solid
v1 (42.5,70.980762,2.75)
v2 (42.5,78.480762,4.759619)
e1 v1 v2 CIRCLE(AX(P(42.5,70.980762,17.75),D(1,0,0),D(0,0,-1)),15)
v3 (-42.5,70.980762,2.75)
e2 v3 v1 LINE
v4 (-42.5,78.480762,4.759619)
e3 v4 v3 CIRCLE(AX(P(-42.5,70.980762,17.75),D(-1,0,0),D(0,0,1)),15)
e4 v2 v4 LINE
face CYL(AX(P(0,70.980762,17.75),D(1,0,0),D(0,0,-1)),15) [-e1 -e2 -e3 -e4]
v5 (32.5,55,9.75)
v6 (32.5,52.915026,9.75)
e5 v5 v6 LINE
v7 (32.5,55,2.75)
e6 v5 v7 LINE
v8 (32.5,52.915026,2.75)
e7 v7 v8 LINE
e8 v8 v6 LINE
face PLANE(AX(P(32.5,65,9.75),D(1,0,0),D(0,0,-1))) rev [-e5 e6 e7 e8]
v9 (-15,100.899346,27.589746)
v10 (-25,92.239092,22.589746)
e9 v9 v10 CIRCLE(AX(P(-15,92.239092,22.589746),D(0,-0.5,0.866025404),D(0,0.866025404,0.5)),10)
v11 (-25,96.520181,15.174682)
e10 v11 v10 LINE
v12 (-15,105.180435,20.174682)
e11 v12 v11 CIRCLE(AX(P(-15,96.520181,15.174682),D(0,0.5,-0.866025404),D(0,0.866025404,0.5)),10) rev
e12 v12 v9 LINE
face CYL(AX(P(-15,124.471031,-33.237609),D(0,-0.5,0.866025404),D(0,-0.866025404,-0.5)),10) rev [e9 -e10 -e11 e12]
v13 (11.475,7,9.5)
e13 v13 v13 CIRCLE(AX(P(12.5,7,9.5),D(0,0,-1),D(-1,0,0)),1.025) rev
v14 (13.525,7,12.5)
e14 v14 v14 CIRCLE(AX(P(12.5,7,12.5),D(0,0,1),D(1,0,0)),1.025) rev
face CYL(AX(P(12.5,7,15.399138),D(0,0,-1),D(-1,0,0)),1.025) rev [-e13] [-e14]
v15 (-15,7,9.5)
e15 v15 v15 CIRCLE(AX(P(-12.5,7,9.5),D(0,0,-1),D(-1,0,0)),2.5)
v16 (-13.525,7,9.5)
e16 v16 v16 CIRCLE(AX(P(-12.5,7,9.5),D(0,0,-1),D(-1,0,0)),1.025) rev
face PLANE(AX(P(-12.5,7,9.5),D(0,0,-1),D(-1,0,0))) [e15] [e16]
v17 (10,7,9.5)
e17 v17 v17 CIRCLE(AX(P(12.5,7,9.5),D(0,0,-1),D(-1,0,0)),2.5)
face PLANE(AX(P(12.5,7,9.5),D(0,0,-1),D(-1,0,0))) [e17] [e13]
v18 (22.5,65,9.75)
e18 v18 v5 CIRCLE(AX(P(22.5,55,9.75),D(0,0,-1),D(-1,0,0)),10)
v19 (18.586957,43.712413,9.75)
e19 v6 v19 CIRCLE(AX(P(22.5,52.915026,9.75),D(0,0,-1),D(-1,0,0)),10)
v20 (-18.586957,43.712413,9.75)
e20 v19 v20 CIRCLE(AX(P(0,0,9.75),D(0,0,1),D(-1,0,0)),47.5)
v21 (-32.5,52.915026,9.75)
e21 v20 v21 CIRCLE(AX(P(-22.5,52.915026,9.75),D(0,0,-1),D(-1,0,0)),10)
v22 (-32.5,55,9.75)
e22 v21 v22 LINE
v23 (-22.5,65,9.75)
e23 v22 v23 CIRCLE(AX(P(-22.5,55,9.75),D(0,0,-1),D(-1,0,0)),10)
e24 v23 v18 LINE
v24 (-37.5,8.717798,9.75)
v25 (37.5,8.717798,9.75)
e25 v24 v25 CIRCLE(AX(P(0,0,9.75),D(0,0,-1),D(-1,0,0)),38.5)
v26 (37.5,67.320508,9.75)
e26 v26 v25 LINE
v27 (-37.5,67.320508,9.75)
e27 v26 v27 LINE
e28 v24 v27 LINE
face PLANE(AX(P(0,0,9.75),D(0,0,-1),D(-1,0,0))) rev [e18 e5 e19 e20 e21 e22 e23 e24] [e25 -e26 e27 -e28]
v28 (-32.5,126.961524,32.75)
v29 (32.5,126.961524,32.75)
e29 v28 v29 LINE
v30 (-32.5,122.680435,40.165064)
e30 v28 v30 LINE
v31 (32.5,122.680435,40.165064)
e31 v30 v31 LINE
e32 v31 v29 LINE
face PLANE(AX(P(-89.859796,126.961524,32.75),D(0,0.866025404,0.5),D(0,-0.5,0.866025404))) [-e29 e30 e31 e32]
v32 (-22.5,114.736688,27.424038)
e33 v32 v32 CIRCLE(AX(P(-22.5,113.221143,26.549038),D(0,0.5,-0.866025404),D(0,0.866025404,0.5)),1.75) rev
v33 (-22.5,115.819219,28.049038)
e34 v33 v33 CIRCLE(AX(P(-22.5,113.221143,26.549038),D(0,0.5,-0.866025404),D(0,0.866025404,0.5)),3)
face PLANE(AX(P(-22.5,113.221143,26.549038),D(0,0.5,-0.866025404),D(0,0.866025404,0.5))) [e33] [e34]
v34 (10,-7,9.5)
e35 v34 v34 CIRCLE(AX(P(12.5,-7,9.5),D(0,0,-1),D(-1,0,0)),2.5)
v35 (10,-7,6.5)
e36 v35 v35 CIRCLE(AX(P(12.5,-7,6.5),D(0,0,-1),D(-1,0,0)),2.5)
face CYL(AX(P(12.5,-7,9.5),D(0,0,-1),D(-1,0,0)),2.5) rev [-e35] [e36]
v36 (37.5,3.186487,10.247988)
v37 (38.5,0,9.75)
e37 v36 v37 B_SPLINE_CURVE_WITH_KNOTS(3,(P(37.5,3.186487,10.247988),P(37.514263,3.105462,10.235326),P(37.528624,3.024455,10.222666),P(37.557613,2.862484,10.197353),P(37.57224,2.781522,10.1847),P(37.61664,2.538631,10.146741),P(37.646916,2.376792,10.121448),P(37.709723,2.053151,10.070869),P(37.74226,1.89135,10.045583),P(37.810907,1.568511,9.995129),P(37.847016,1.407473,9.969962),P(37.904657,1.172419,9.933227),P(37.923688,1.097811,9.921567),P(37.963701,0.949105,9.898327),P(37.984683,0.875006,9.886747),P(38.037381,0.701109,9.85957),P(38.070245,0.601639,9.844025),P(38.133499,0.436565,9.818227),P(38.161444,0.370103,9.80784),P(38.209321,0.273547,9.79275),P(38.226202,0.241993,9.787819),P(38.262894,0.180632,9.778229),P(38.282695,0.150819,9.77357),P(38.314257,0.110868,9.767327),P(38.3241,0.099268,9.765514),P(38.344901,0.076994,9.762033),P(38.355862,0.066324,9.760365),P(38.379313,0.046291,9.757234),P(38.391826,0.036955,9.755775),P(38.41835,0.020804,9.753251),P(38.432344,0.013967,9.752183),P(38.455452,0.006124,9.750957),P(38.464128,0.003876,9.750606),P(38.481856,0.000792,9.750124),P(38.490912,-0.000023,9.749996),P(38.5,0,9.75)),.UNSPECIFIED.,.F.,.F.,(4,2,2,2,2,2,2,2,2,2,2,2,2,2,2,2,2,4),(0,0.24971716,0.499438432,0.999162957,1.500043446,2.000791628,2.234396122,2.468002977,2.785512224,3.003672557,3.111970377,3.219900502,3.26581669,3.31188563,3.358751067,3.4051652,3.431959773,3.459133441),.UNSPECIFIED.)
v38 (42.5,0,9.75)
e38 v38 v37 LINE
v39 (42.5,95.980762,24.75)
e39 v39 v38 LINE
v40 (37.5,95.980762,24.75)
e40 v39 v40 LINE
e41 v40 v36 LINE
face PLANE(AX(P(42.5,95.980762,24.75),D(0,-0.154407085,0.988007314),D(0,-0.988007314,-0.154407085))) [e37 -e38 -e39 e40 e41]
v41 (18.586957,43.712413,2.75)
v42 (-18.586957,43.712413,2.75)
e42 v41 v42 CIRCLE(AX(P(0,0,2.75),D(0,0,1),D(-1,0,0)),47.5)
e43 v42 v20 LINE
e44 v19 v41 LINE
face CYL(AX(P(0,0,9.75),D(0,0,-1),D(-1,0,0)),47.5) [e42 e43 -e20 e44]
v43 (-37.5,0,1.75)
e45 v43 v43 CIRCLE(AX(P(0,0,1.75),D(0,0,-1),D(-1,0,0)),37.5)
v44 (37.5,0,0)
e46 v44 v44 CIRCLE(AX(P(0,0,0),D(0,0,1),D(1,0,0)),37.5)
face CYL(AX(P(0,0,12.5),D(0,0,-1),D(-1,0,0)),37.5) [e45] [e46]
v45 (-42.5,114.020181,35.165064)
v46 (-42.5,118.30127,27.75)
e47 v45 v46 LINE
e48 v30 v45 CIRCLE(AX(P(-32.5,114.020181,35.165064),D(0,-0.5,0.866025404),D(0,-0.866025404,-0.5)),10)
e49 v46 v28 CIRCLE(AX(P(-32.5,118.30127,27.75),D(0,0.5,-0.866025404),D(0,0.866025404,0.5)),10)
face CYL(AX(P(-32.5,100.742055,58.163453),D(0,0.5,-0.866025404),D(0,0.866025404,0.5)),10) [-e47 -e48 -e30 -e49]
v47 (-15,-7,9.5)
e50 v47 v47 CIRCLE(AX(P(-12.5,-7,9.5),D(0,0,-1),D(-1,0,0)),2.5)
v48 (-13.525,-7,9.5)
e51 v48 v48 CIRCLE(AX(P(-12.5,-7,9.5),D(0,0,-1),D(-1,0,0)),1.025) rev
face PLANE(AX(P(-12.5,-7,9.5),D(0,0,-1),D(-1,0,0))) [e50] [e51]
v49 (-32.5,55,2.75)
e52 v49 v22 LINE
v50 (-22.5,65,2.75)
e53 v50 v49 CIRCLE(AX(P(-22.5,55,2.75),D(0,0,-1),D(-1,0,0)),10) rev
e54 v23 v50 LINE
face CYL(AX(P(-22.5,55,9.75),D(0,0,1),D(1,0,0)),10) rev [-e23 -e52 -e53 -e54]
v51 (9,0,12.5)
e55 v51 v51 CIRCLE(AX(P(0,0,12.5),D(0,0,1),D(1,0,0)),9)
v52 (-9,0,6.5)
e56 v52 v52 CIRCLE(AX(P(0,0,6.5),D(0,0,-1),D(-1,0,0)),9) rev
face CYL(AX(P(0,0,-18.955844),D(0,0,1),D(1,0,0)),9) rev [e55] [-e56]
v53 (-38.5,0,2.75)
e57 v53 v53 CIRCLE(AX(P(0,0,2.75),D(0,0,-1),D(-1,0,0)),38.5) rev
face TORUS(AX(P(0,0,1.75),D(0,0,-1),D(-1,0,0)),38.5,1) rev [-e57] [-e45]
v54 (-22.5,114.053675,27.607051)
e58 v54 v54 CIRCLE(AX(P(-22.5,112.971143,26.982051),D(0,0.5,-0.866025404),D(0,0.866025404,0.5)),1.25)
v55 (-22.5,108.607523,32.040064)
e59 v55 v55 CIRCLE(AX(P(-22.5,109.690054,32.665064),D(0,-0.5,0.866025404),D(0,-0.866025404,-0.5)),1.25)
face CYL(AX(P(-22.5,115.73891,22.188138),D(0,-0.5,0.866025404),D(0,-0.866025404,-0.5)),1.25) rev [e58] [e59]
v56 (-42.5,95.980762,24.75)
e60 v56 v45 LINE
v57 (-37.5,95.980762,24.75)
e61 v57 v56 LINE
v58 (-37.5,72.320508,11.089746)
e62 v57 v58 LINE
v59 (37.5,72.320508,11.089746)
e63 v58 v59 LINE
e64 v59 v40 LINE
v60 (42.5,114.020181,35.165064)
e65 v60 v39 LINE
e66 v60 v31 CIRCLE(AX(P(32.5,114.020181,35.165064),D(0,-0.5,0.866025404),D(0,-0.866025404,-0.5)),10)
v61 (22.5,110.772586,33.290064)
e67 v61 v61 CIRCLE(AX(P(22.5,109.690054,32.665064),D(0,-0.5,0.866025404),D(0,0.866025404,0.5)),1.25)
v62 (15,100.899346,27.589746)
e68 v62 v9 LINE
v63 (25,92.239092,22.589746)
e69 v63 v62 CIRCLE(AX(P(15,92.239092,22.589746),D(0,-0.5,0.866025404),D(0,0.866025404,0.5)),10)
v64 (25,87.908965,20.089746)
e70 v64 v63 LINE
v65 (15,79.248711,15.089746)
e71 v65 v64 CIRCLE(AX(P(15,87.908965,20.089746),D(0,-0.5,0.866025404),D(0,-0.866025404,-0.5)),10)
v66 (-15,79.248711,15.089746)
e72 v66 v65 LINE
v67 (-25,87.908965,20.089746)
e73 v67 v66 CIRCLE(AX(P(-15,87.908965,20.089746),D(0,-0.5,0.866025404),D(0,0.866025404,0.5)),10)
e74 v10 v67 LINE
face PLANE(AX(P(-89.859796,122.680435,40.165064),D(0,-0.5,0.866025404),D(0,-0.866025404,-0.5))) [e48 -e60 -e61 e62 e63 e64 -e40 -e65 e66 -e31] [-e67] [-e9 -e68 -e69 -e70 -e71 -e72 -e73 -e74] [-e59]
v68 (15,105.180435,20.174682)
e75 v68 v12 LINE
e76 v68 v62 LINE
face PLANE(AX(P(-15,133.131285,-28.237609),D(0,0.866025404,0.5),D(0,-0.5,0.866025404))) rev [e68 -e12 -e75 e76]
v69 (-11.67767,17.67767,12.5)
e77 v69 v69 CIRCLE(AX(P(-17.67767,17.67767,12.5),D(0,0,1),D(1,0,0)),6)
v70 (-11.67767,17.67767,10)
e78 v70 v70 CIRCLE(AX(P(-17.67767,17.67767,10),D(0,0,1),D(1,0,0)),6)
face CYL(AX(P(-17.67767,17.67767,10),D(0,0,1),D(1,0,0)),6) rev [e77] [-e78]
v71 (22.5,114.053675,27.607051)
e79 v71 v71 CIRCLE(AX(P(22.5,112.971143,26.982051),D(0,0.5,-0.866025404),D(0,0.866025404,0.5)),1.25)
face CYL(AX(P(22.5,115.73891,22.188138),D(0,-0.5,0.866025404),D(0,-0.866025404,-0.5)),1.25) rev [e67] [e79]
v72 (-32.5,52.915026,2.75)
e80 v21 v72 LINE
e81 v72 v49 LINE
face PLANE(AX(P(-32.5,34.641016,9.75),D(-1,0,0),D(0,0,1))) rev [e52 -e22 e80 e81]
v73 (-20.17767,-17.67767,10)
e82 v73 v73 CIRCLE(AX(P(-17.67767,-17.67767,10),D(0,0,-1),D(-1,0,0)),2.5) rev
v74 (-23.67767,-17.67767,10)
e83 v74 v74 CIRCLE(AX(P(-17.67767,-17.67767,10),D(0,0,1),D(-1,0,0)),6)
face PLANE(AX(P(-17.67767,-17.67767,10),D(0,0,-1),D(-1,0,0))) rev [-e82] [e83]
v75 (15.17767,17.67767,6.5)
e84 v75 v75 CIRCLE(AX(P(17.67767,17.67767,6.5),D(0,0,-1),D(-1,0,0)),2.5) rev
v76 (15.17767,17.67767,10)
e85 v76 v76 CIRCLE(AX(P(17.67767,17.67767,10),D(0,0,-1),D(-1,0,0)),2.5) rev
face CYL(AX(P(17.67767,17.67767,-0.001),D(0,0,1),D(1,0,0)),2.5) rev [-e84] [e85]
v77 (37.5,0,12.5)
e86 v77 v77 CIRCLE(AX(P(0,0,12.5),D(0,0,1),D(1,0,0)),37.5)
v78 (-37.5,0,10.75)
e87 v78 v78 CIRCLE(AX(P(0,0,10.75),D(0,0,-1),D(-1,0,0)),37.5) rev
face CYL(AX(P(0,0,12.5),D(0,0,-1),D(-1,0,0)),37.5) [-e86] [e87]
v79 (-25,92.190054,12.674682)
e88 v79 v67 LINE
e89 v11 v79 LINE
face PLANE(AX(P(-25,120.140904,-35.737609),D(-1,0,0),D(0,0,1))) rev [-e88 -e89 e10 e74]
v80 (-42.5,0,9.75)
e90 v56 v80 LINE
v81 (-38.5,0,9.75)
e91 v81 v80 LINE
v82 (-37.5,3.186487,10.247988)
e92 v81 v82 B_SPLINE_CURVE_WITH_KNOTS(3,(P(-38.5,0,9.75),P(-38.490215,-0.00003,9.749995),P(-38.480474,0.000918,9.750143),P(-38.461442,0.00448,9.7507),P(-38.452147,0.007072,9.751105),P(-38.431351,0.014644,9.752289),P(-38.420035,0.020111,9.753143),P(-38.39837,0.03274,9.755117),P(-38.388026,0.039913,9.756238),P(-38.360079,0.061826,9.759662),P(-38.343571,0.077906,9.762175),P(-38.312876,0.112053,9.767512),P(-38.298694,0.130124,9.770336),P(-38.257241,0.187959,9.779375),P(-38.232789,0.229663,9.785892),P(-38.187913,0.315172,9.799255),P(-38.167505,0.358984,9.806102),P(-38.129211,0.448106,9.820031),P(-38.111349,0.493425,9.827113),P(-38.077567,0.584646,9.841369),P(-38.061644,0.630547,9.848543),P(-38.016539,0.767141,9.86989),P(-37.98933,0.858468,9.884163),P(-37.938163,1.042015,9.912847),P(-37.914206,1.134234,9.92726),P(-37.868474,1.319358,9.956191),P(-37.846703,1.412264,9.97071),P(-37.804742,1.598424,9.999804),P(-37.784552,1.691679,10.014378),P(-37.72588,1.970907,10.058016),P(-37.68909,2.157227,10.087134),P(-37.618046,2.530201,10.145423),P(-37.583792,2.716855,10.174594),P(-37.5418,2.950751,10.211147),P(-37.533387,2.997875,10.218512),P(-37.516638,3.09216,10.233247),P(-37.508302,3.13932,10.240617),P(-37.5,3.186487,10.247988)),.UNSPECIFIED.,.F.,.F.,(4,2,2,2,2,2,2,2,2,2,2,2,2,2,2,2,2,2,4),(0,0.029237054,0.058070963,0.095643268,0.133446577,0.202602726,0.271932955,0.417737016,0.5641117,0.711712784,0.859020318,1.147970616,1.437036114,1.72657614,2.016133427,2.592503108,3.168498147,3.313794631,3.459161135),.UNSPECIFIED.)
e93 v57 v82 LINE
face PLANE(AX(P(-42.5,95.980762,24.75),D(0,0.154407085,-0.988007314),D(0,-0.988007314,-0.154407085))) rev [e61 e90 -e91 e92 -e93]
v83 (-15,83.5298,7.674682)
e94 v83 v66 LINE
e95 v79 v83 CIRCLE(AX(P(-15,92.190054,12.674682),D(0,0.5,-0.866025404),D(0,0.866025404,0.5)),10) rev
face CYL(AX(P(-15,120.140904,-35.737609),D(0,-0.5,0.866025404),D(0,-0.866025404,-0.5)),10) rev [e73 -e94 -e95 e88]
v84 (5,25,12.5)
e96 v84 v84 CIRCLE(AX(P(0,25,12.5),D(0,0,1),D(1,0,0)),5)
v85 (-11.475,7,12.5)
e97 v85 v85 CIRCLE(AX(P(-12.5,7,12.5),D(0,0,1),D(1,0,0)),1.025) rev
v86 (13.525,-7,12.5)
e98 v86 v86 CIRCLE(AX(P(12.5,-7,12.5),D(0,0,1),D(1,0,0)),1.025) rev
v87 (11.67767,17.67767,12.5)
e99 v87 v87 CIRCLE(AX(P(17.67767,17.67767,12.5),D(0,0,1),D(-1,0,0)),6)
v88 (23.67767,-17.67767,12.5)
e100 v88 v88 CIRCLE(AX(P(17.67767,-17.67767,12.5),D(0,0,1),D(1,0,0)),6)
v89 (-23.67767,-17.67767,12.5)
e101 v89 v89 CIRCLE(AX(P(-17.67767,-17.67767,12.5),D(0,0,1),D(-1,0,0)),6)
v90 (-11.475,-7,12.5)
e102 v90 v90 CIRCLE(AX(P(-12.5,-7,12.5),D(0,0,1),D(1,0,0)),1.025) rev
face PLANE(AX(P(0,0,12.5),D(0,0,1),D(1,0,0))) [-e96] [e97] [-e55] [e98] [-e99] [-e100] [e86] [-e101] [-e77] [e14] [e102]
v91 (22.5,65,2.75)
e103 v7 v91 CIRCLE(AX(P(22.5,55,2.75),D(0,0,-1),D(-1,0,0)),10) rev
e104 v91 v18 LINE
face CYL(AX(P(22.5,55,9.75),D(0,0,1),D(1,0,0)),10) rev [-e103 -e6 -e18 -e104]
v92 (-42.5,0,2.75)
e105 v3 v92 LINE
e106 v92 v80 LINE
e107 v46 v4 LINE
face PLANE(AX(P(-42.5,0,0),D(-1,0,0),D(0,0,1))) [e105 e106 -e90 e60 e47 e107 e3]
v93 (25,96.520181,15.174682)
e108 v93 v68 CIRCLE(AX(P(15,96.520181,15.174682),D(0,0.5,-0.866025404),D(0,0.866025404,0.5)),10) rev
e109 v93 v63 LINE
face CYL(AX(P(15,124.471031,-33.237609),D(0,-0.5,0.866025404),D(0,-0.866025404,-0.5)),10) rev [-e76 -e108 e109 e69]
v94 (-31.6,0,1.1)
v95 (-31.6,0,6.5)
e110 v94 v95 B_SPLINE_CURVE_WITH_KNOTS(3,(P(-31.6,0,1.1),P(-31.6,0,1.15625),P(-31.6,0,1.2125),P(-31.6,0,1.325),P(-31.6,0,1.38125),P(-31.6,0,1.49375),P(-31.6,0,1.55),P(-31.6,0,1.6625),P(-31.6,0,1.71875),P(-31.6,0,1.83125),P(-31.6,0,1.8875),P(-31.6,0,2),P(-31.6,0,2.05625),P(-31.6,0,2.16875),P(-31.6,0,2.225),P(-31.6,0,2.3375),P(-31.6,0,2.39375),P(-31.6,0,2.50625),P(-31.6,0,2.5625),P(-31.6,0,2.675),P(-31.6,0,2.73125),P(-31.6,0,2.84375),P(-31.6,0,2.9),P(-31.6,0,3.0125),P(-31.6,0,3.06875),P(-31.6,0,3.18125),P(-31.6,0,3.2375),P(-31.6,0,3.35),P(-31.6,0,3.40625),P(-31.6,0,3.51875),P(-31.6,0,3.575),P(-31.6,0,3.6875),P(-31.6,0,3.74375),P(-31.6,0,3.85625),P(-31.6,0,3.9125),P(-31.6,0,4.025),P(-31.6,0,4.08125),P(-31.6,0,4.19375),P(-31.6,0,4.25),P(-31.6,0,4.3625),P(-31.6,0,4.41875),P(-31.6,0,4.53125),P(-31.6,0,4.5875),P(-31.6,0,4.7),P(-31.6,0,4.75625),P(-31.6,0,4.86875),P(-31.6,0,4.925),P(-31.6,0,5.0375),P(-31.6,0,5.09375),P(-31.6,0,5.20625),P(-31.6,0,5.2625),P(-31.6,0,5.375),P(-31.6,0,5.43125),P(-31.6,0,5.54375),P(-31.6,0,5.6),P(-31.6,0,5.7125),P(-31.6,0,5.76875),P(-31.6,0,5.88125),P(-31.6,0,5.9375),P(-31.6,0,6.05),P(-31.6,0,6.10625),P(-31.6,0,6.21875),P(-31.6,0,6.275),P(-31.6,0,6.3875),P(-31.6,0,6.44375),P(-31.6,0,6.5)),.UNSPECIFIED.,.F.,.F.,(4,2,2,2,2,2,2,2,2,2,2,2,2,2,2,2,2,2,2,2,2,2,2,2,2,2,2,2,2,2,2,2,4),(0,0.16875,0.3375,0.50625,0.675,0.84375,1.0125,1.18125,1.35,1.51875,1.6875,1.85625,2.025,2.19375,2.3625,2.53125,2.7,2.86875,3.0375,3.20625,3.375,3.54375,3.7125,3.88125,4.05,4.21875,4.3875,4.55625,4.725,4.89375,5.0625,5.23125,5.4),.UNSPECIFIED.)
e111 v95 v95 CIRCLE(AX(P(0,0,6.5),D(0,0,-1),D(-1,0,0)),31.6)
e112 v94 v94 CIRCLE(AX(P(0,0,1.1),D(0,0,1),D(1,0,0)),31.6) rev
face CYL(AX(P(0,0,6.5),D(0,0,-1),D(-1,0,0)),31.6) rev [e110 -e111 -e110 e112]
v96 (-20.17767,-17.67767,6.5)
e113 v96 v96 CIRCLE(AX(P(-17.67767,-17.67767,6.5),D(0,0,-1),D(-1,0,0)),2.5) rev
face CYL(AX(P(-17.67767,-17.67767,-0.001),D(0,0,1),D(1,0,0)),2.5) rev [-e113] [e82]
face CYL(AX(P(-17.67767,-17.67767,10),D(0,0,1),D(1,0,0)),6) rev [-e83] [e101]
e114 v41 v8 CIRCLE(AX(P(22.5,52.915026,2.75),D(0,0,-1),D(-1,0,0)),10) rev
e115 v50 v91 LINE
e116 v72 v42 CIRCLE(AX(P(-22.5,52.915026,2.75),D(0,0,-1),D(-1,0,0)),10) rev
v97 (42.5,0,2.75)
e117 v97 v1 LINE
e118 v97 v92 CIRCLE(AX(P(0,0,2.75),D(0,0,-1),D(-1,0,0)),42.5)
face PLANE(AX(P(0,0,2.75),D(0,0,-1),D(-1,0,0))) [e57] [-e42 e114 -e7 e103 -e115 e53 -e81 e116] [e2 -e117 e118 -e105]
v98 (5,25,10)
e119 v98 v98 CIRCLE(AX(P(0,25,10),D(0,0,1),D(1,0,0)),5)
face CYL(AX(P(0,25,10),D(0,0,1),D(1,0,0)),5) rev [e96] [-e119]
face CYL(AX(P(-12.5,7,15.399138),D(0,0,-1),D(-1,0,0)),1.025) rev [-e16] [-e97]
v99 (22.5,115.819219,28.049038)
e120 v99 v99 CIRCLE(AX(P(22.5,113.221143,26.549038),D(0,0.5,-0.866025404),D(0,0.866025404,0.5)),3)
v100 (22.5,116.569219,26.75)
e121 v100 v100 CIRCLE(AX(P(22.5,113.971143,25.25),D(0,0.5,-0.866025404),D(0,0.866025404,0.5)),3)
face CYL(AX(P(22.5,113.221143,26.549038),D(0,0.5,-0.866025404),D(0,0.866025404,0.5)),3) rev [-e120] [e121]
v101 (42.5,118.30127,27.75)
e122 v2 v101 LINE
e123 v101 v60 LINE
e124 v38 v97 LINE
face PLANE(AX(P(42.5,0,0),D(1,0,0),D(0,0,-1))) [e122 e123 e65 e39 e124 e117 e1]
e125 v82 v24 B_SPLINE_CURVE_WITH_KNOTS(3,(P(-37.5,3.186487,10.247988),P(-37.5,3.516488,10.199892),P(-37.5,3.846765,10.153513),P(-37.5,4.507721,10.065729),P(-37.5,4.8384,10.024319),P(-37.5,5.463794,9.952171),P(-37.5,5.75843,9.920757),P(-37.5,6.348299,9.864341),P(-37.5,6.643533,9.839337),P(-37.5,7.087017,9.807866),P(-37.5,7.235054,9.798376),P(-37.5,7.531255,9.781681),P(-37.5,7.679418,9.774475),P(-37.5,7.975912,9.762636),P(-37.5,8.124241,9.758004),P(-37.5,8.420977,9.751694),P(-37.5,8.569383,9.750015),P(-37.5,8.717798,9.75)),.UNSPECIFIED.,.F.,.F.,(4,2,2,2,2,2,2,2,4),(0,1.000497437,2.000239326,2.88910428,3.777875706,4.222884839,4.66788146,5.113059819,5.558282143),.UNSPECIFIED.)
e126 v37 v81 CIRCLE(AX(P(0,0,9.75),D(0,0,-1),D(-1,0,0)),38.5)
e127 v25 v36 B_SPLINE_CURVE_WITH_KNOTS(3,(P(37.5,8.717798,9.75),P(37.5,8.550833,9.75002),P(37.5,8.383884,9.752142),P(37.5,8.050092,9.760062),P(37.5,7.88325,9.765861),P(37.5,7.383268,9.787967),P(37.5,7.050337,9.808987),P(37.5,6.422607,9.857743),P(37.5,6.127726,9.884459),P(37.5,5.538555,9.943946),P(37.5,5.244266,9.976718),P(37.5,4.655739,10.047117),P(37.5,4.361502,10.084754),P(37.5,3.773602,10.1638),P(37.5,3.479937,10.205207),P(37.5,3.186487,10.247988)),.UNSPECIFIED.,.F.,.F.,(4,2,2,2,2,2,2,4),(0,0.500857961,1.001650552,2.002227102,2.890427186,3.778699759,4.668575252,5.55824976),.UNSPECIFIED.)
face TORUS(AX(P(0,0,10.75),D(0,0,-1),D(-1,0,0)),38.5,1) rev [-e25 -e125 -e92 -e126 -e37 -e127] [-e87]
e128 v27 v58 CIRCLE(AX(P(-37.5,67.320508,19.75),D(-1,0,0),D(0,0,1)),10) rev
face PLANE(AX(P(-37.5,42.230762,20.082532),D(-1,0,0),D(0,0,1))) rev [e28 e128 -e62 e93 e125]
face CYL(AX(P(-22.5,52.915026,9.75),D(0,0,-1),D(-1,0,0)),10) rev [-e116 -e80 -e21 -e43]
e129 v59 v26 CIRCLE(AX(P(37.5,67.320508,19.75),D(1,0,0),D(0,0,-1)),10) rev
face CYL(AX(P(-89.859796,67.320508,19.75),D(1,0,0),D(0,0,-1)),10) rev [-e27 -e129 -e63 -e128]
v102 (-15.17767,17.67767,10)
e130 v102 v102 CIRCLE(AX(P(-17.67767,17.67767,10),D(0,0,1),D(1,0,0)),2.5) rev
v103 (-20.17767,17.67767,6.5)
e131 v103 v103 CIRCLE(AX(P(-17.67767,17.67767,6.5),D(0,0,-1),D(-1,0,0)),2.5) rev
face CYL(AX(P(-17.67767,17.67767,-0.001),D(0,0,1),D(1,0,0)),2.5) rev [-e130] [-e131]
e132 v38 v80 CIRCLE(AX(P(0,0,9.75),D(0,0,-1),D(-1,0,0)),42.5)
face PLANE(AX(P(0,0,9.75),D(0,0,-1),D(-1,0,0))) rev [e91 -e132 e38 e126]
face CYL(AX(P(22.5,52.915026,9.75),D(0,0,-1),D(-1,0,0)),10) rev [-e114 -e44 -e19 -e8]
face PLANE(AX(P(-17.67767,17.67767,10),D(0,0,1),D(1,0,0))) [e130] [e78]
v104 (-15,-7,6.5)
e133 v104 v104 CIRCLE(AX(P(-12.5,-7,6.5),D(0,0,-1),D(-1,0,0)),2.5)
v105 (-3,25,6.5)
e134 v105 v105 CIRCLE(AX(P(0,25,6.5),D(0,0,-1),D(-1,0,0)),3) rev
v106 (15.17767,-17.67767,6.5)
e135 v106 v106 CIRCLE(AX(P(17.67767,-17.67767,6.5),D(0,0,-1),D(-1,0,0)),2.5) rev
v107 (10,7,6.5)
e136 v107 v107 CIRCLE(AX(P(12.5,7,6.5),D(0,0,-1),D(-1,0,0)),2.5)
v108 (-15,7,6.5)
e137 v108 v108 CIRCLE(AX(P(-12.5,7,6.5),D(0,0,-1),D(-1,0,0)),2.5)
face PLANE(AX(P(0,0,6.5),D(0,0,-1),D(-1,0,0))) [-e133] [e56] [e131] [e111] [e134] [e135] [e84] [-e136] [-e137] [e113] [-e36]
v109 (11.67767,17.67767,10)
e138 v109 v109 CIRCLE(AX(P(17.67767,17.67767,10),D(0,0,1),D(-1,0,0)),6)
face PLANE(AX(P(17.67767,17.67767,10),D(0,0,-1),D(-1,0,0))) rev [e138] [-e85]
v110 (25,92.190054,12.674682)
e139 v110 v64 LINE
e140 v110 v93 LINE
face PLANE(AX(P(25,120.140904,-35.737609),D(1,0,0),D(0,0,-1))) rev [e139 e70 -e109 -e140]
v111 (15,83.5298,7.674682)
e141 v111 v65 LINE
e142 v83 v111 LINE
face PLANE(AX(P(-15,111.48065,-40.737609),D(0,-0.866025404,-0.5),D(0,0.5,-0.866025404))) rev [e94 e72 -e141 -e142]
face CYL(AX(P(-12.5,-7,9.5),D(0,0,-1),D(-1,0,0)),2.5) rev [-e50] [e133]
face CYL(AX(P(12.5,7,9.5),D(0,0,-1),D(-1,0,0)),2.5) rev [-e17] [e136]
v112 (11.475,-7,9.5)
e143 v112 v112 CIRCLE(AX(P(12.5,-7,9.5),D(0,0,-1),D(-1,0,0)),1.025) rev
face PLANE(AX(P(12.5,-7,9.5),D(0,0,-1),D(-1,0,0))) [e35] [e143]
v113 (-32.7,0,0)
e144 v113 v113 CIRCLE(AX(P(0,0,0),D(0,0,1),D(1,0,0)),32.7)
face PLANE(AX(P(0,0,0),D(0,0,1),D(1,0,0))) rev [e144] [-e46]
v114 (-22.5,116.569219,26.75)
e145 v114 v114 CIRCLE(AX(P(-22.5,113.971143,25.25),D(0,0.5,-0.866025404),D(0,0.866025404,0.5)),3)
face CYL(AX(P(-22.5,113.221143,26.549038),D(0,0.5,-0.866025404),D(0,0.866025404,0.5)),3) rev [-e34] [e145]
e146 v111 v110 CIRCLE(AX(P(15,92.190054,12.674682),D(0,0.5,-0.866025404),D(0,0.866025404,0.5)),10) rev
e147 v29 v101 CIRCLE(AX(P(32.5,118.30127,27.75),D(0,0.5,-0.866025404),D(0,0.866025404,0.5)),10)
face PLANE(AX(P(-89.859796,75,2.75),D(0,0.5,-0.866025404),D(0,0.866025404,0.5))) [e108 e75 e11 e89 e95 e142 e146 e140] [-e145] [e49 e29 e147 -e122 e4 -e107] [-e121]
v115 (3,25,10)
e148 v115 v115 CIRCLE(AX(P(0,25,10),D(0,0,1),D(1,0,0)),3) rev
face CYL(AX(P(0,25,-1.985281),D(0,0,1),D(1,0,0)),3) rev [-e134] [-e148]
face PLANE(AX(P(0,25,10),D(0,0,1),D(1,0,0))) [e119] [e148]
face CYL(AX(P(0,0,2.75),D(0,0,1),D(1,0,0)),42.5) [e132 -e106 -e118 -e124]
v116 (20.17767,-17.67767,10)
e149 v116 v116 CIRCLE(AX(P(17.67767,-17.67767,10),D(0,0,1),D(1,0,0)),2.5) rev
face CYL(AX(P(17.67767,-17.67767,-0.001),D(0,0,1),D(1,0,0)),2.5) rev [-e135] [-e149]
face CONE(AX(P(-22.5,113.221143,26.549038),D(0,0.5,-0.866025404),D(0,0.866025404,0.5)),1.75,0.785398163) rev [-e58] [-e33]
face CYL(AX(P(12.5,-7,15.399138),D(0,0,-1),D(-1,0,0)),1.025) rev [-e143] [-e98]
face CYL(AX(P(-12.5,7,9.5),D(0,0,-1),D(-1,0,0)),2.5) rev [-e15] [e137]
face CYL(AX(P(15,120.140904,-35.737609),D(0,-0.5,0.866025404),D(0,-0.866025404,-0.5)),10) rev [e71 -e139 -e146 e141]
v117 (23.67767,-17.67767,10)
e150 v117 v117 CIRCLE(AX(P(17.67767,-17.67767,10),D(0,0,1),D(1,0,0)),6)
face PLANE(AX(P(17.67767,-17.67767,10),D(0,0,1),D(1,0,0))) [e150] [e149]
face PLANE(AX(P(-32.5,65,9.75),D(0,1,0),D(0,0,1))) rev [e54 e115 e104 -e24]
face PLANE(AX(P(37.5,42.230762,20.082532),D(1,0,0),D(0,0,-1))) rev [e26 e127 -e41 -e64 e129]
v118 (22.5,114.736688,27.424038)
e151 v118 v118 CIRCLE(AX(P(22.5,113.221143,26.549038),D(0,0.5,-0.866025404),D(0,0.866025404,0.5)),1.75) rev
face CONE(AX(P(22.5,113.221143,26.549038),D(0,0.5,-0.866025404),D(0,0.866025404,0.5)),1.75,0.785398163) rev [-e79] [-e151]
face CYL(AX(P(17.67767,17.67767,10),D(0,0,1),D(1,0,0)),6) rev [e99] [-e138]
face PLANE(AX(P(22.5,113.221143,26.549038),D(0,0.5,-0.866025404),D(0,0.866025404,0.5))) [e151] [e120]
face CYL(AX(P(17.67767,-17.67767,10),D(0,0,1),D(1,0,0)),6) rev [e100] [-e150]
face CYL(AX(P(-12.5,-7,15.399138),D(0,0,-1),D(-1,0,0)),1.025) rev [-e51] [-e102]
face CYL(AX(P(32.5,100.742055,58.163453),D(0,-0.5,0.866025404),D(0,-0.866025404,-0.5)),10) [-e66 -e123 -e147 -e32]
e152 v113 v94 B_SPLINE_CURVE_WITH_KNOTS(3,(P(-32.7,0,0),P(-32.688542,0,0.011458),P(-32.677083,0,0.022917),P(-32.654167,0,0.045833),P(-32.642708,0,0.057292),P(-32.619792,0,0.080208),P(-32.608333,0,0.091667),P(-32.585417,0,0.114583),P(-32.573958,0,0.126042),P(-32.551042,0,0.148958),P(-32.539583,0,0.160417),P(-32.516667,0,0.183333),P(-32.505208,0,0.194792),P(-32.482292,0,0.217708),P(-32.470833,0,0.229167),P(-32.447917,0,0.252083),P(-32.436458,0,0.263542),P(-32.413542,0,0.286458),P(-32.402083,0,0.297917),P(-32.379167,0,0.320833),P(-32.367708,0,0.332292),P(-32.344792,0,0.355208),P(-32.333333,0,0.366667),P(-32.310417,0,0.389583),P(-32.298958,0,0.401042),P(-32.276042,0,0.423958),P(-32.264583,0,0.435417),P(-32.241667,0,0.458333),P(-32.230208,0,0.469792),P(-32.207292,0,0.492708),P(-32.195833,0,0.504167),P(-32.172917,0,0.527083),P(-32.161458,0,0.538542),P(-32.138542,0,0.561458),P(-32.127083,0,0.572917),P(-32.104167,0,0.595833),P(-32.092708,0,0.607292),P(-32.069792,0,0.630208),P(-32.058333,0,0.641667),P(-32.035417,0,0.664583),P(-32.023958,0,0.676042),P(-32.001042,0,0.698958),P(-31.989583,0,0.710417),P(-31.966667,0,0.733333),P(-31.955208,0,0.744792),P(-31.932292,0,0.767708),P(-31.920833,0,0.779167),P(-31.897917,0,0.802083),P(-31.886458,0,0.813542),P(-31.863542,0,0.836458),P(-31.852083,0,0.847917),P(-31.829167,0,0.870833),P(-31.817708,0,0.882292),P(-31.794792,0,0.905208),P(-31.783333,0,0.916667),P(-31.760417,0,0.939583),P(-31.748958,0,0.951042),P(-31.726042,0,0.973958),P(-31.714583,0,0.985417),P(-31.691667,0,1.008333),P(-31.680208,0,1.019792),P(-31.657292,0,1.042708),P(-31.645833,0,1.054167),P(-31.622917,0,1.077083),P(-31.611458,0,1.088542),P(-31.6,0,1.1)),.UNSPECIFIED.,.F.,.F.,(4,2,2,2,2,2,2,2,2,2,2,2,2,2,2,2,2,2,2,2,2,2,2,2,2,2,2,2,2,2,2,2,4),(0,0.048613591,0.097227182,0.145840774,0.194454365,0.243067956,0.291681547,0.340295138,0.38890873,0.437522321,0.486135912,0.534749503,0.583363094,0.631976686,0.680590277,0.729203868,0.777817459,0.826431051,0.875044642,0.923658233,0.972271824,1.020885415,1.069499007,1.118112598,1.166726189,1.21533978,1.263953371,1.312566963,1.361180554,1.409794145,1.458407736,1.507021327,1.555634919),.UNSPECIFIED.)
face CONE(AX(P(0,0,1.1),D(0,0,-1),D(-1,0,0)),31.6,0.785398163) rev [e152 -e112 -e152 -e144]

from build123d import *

# Parameters (mm, degrees)
SKETCH_1_R            = 37.5
EXTRUDE_1_DEPTH       = 12.5
SKETCH_2_R            = 31.6
CUT_EXTRUDE_1_DEPTH   = 6.5
CUT_EXTRUDE_2_REACH   = 56.486
SKETCH_3_R            = 2.5
SKETCH_4_R            = 6
CUT_EXTRUDE_3_DEPTH   = 2.5
CHAMFER_2_SIZE        = 1.1
SKETCH_14_R           = 1.025
CUT_EXTRUDE_4_DEPTH   = 6
SKETCH_15_R           = 2.5
CUT_EXTRUDE_5_DEPTH   = 3
SKETCH_17_R           = 9
CUT_EXTRUDE_7_DEPTH   = 6
SKETCH_18_R           = 3
CUT_EXTRUDE_8_DEPTH   = 6
SKETCH_19_R           = 5
CUT_EXTRUDE_9_DEPTH   = 2.5
SKETCH_24_R           = 42.5
SKETCH_24_R_2         = 37.5
EXTRUDE_2_DEPTH       = 3.5
EXTRUDE_START         = 40.640001537
EXTRUDE_3_OUTLINE_W   = 132.359796054
EXTRUDE_3_OUTLINE_H   = 7
EXTRUDE_3_DEPTH       = 34.359998463
EXTRUDE_START_2       = 2.75
EXTRUDE_3_2_DEPTH     = 7
EXTRUDE_START_3       = 26.556252313
EXTRUDE_3_3_OUTLINE_W = 132.359796054
EXTRUDE_3_3_OUTLINE_H = 60
EXTRUDE_3_3_DEPTH     = 8.562177827
EXTRUDE_3_4_OUTLINE_W = 132.359796054
EXTRUDE_3_4_OUTLINE_H = 0.830127019
EXTRUDE_3_4_DEPTH     = 2.5
CUT_EXTRUDE_11_DEPTH  = 47.359796
CUT_EXTRUDE_12_DEPTH  = 7
RIB_10_REACH          = 159.979
SKETCH_31_WALL_W      = 415.104412192
SKETCH_31_WALL_H      = 5
FILLET_6_R            = 10
FILLET_7_R            = 10
SKETCH_34_R           = 1.25
CUT_EXTRUDE_14_DEPTH  = 8.562177826
SKETCH_35_R           = 3
CUT_EXTRUDE_15_DEPTH  = 1.5
CUT_EXTRUDE_16_DEPTH  = 8.562177826
FILLET_9_R            = 1
FILLET_10_R           = 15
CHAMFER_3_SIZE        = 0.5
FILLET_11_R           = 10
FILLET_12_R           = 10


with BuildPart() as part:
    # 草图1 → 凸台-拉伸1 (new body)
    with BuildSketch(Plane.XY):
        Circle(SKETCH_1_R)
    extrude(amount=EXTRUDE_1_DEPTH)

    # 草图2 → 切除-拉伸1 (cut)
    with BuildSketch(Plane(origin=(0, 0, 0), x_dir=(-1, 0, 0), z_dir=(0, 0, -1))):
        Circle(SKETCH_2_R)
    extrude(amount=-CUT_EXTRUDE_1_DEPTH, mode=Mode.SUBTRACT)

    # 草图3 → 切除-拉伸2 (cut, up to next)
    with BuildSketch(Plane.XY.offset(12.5), mode=Mode.PRIVATE) as cut_extrude_2_sk1:
        with Locations((17.67766953, 17.67766953)):
            Circle(SKETCH_3_R)
    cut_extrude_2_tool1 = extrude(cut_extrude_2_sk1.sketch, amount=-CUT_EXTRUDE_2_REACH, mode=Mode.PRIVATE) & part.part
    # 草图3 → 切除-拉伸2 (cut, up to next)
    with BuildSketch(Plane.XY.offset(12.5), mode=Mode.PRIVATE) as cut_extrude_2_sk2:
        with Locations(Location((17.67766953, -17.67766953, 0), (0, 0, 180))):
            Circle(SKETCH_3_R)
    cut_extrude_2_tool2 = extrude(cut_extrude_2_sk2.sketch, amount=-CUT_EXTRUDE_2_REACH, mode=Mode.PRIVATE) & part.part
    # 草图3 → 切除-拉伸2 (cut, up to next)
    with BuildSketch(Plane.XY.offset(12.5), mode=Mode.PRIVATE) as cut_extrude_2_sk3:
        with Locations((-17.67766953, -17.67766953)):
            Circle(SKETCH_3_R)
    cut_extrude_2_tool3 = extrude(cut_extrude_2_sk3.sketch, amount=-CUT_EXTRUDE_2_REACH, mode=Mode.PRIVATE) & part.part
    # 草图3 → 切除-拉伸2 (cut, up to next)
    with BuildSketch(Plane.XY.offset(12.5), mode=Mode.PRIVATE) as cut_extrude_2_sk4:
        with Locations(Location((-17.67766953, 17.67766953, 0), (0, 0, 180))):
            Circle(SKETCH_3_R)
    cut_extrude_2_tool4 = extrude(cut_extrude_2_sk4.sketch, amount=-CUT_EXTRUDE_2_REACH, mode=Mode.PRIVATE) & part.part
    add(cut_extrude_2_tool1.solids().sort_by_distance((17.67767, 17.67767, 12.5))[0], mode=Mode.SUBTRACT)
    add(cut_extrude_2_tool2.solids().sort_by_distance((17.67767, -17.67767, 12.5))[0], mode=Mode.SUBTRACT)
    add(cut_extrude_2_tool3.solids().sort_by_distance((-17.67767, -17.67767, 12.5))[0], mode=Mode.SUBTRACT)
    add(cut_extrude_2_tool4.solids().sort_by_distance((-17.67767, 17.67767, 12.5))[0], mode=Mode.SUBTRACT)

    # 草图4 → 切除-拉伸3 (cut)
    with BuildSketch(Plane.XY.offset(12.5)):
        with Locations((-17.67766953, 17.67766953)):
            Circle(SKETCH_4_R)
        with Locations(Location((17.67766953, 17.67766953, 0), (0, 0, 180))):
            Circle(SKETCH_4_R)
        with Locations((17.67766953, -17.67766953)):
            Circle(SKETCH_4_R)
        with Locations(Location((-17.67766953, -17.67766953, 0), (0, 0, 180))):
            Circle(SKETCH_4_R)
    extrude(amount=-CUT_EXTRUDE_3_DEPTH, mode=Mode.SUBTRACT)

    # 倒角2
    chamfer_2_edges = [part.edges().sort_by_distance(p)[0] for p in [
        (31.6, 0, 0),
    ]]
    chamfer(chamfer_2_edges, length=CHAMFER_2_SIZE)

    # 草图14 → 切除-拉伸4 (cut)
    with BuildSketch(Plane(origin=(0, 0, 6.5), x_dir=(-1, 0, 0), z_dir=(0, 0, -1))):
        with Locations((12.5, 7)):
            Circle(SKETCH_14_R)
        with Locations(Location((12.5, -7, 0), (0, 0, 180))):
            Circle(SKETCH_14_R)
        with Locations((-12.5, -7)):
            Circle(SKETCH_14_R)
        with Locations(Location((-12.5, 7, 0), (0, 0, 180))):
            Circle(SKETCH_14_R)
    extrude(amount=-CUT_EXTRUDE_4_DEPTH, mode=Mode.SUBTRACT)

    # 草图15 → 切除-拉伸5 (cut)
    with BuildSketch(Plane(origin=(0, 0, 6.5), x_dir=(-1, 0, 0), z_dir=(0, 0, -1))):
        with Locations((12.5, 7)):
            Circle(SKETCH_15_R)
        with Locations((12.5, -7)):
            Circle(SKETCH_15_R)
        with Locations((-12.5, -7)):
            Circle(SKETCH_15_R)
        with Locations((-12.5, 7)):
            Circle(SKETCH_15_R)
    extrude(amount=-CUT_EXTRUDE_5_DEPTH, mode=Mode.SUBTRACT)

    # 草图17 → 切除-拉伸7 (cut)
    with BuildSketch(Plane.XY.offset(12.5)):
        Circle(SKETCH_17_R)
    extrude(amount=-CUT_EXTRUDE_7_DEPTH, mode=Mode.SUBTRACT)

    # 草图18 → 切除-拉伸8 (cut)
    with BuildSketch(Plane.XY.offset(12.5)):
        with Locations((0, 25)):
            Circle(SKETCH_18_R)
    extrude(amount=-CUT_EXTRUDE_8_DEPTH, mode=Mode.SUBTRACT)

    # 草图19 → 切除-拉伸9 (cut)
    with BuildSketch(Plane.XY.offset(12.5)):
        with Locations((0, 25)):
            Circle(SKETCH_19_R)
    extrude(amount=-CUT_EXTRUDE_9_DEPTH, mode=Mode.SUBTRACT)

    # 草图24 → 凸台-拉伸2 (add, symmetric)
    with BuildSketch(Plane(origin=(0, 0, 6.25), x_dir=(-1, 0, 0), z_dir=(0, 0, -1))):
        Circle(SKETCH_24_R)
        Circle(SKETCH_24_R_2, mode=Mode.SUBTRACT)
    extrude(amount=EXTRUDE_2_DEPTH, both=True)

    # 凸台-拉伸3: read off the stored shape, not the designer's step
    # 凸台-拉伸3 outline → 凸台-拉伸3 (add)
    with BuildSketch(Plane(origin=(0, 0, 0), x_dir=(1, 0, 0), z_dir=(0, 1, 0)).offset(EXTRUDE_START)):
        with Locations((-23.679898027, -6.25)):
            Rectangle(EXTRUDE_3_OUTLINE_W, EXTRUDE_3_OUTLINE_H)
    extrude(amount=EXTRUDE_3_DEPTH)

    # Extrude 3 2 outline → Extrude 3 2 (add)
    with BuildSketch(Plane.XY.offset(EXTRUDE_START_2)):
        with BuildLine():
            Line((-89.859796054, 40.640001537), (-89.859796054, 0))
            Line((-89.859796054, 0), (-42.5, 0))
            ThreePointArc((-42.5, 0), (-34.166916622, 25.275913604), (-12.435444305, 40.640001537))
            Line((-12.435444305, 40.640001537), (-89.859796054, 40.640001537))
        make_face()
        with BuildLine():
            ThreePointArc((12.435444305, 40.640001537), (34.166916622, 25.275913604), (42.5, 0))
            Line((42.5, 0), (42.5, 40.640001537))
            Line((42.5, 40.640001537), (12.435444305, 40.640001537))
        make_face()
    extrude(amount=EXTRUDE_3_2_DEPTH)

    # Extrude 3 3 outline → Extrude 3 3 (add)
    with BuildSketch(Plane(origin=(0, 0, 0), x_dir=(1, 0, 0), z_dir=(0, 0.500000000000001, -0.866025403784438)).offset(EXTRUDE_START_3)):
        with Locations((-23.679898027, -96.326905284)):
            Rectangle(EXTRUDE_3_3_OUTLINE_W, EXTRUDE_3_3_OUTLINE_H)
    extrude(amount=EXTRUDE_3_3_DEPTH)

    # Extrude 3 4 outline → Extrude 3 4 (add)
    with BuildSketch(Plane(origin=(0, 0, 0), x_dir=(1, 0, 0), z_dir=(0, 0.500000000000001, -0.866025403784438)).offset(EXTRUDE_START_3)):
        with Locations((-23.679898027, -65.911841775)):
            Rectangle(EXTRUDE_3_4_OUTLINE_W, EXTRUDE_3_4_OUTLINE_H)
    extrude(amount=EXTRUDE_3_4_DEPTH)

    # 草图26 → 切除-拉伸11 (cut)
    with BuildSketch(Plane.ZY.offset(89.859796054)):
        Polygon((9.75, 0), (9.75, 70), (40.165063509, 122.680435314), (32.75, 126.961524227), (2.75, 75), (2.75, 0), align=None)
    extrude(amount=-CUT_EXTRUDE_11_DEPTH, mode=Mode.SUBTRACT)

    # 草图27 → 切除-拉伸12 (cut)
    with BuildSketch(Plane(origin=(0, 0, 2.75), x_dir=(-1, 0, 0), z_dir=(0, 0, -1))):
        with BuildLine():
            Line((32.5, 34.641016151), (32.5, 65))
            Line((32.5, 65), (-32.5, 65))
            Line((-32.5, 65), (-32.5, 34.641016151))
            ThreePointArc((-32.5, 34.641016151), (0, 47.5), (32.5, 34.641016151))
        make_face()
    extrude(amount=-CUT_EXTRUDE_12_DEPTH, mode=Mode.SUBTRACT)

    # 草图31 wall → 筋10 (add, up to next)
    with BuildSketch(Plane(origin=(-42.5, 47.990381057, 17.25), x_dir=(0, -0.988007313769, -0.15440708513), z_dir=(0, -0.15440708513, 0.988007313769)), mode=Mode.PRIVATE) as rib_10_sk1:
        with Locations((0, 2.5)):
            Rectangle(SKETCH_31_WALL_W, SKETCH_31_WALL_H)
    rib_10_tool1 = extrude(rib_10_sk1.sketch, amount=-RIB_10_REACH, mode=Mode.PRIVATE) - part.part
    rib_10 = rib_10_tool1.solids().sort_by_distance((-42.5, 47.990381057, 17.25))[0]
    add(rib_10)

    # 镜向2: 筋10 across plane
    add(rib_10.mirror(Plane(origin=(0, 0, 0), x_dir=(0, 0, 1), z_dir=(1, 0, 0))))

    # 圆角6
    fillet_6_edges = [part.edges().sort_by_distance(p)[0] for p in [
        (0, 70, 9.75),
    ]]
    fillet(fillet_6_edges, radius=FILLET_6_R)

    # 圆角7
    fillet_7_edges = [part.edges().sort_by_distance(p)[0] for p in [
        (42.5, 124.820979771, 36.457531755),
        (-42.500000054, 124.82097977, 36.457531755),
    ]]
    fillet(fillet_7_edges, radius=FILLET_7_R)

    # 草图34 → 切除-拉伸14 (cut)
    with BuildSketch(Plane(origin=(0, 13.278126157, -22.998389132), x_dir=(1, 0, 0), z_dir=(0, -0.5000000000000017, 0.8660254037844378))):
        with Locations(Location((-22.5, 111.326905284, 0), (0, 0, 270))):
            Circle(SKETCH_34_R)
        with Locations(Location((22.5, 111.326905284, 0), (0, 0, 90))):
            Circle(SKETCH_34_R)
    extrude(amount=-CUT_EXTRUDE_14_DEPTH, mode=Mode.SUBTRACT)

    # 草图35 → 切除-拉伸15 (cut)
    with BuildSketch(Plane(origin=(0, 17.55921507, -30.413452642), x_dir=(-1, 0, 0), z_dir=(0, 0.5000000000000013, -0.8660254037844379))):
        with Locations(Location((-22.5, 111.326905284, 0), (0, 0, 90))):
            Circle(SKETCH_35_R)
        with Locations(Location((22.5, 111.326905284, 0), (0, 0, 90))):
            Circle(SKETCH_35_R)
    extrude(amount=-CUT_EXTRUDE_15_DEPTH, mode=Mode.SUBTRACT)

    # 草图36 → 切除-拉伸16 (cut)
    with BuildSketch(Plane(origin=(0, 13.278126157, -22.998389132), x_dir=(1, 0, 0), z_dir=(0, -0.5000000000000017, 0.8660254037844378))):
        with BuildLine():
            Line((-15, 76.176270189), (15, 76.176270189))
            ThreePointArc((15, 76.176270189), (22.071067812, 79.105202377), (25, 86.176270189))
            Line((25, 86.176270189), (25, 91.176270189))
            ThreePointArc((25, 91.176270189), (22.071067812, 98.247338001), (15, 101.176270189))
            Line((15, 101.176270189), (-15, 101.176270189))
            ThreePointArc((-15, 101.176270189), (-22.071067812, 98.247338001), (-25, 91.176270189))
            Line((-25, 91.176270189), (-25, 86.176270189))
            ThreePointArc((-25, 86.176270189), (-22.071067812, 79.105202377), (-15, 76.176270189))
        make_face()
    extrude(amount=-CUT_EXTRUDE_16_DEPTH, mode=Mode.SUBTRACT)

    # 圆角9
    # the kernel refuses this fillet: 1 mm, written as the material it adds along each edge
    with BuildSketch(Plane(origin=(0, 0, 9.75), x_dir=(-1.0, 3.747518651596283e-12, 0), z_dir=(-3.747518651596283e-12, -1.0, 0))) as fillet_9_piece_1:
        with BuildLine():
            CenterArc((37.5 + FILLET_9_R, -FILLET_9_R), FILLET_9_R, 90, 90)
            Line((37.5, -FILLET_9_R), (37.5, 0))
            Line((37.5, 0), (37.5 + FILLET_9_R, 0))
        make_face()
    revolve(axis=Axis((0, 0, 9.75), (0, 0, -1)), revolution_arc=180)
    with BuildSketch(Plane(origin=(0, 0, 2.75), x_dir=(1, 0, 0), z_dir=(0, 1, 0))) as fillet_9_piece_2:
        with BuildLine():
            CenterArc((37.5 + FILLET_9_R, FILLET_9_R), FILLET_9_R, 180, 90)
            Line((37.5, FILLET_9_R), (37.5, 0))
            Line((37.5, 0), (37.5 + FILLET_9_R, 0))
        make_face()
    revolve(axis=Axis((0, 0, 2.75), (0, 0, -1)))
    with BuildSketch(Plane(origin=(0, 0, 9.75), x_dir=(1, 0, 0), z_dir=(0, 1, 0))) as fillet_9_piece_3:
        with BuildLine():
            CenterArc((37.5 + FILLET_9_R, -FILLET_9_R), FILLET_9_R, 90, 90)
            Line((37.5, -FILLET_9_R), (37.5, 0))
            Line((37.5, 0), (37.5 + FILLET_9_R, 0))
        make_face()
    revolve(axis=Axis((0, 0, 9.75), (0, 0, -1)), revolution_arc=180)

    # 圆角10
    fillet_10_edges = [part.edges().sort_by_distance(p)[0] for p in [
        (-2.7e-08, 75, 2.75),
    ]]
    fillet(fillet_10_edges, radius=FILLET_10_R)

    # 倒角3
    chamfer_3_edges = [part.edges().sort_by_distance(p)[0] for p in [
        (22.5, 112.138611416, 25.924038106),
        (-22.5, 114.303674925, 27.174038106),
    ]]
    chamfer(chamfer_3_edges, length=CHAMFER_3_SIZE)

    # 圆角11
    fillet_11_edges = [part.edges().sort_by_distance(p)[0] for p in [
        (32.5, 65, 6.25),
        (-32.5, 65, 6.25),
    ]]
    fillet(fillet_11_edges, radius=FILLET_11_R)

    # 圆角12
    fillet_12_edges = [part.edges().sort_by_distance(p)[0] for p in [
        (-32.5, 34.641016151, 6.25),
        (32.5, 34.641016151, 6.25),
    ]]
    fillet(fillet_12_edges, radius=FILLET_12_R)


solid = part.part
